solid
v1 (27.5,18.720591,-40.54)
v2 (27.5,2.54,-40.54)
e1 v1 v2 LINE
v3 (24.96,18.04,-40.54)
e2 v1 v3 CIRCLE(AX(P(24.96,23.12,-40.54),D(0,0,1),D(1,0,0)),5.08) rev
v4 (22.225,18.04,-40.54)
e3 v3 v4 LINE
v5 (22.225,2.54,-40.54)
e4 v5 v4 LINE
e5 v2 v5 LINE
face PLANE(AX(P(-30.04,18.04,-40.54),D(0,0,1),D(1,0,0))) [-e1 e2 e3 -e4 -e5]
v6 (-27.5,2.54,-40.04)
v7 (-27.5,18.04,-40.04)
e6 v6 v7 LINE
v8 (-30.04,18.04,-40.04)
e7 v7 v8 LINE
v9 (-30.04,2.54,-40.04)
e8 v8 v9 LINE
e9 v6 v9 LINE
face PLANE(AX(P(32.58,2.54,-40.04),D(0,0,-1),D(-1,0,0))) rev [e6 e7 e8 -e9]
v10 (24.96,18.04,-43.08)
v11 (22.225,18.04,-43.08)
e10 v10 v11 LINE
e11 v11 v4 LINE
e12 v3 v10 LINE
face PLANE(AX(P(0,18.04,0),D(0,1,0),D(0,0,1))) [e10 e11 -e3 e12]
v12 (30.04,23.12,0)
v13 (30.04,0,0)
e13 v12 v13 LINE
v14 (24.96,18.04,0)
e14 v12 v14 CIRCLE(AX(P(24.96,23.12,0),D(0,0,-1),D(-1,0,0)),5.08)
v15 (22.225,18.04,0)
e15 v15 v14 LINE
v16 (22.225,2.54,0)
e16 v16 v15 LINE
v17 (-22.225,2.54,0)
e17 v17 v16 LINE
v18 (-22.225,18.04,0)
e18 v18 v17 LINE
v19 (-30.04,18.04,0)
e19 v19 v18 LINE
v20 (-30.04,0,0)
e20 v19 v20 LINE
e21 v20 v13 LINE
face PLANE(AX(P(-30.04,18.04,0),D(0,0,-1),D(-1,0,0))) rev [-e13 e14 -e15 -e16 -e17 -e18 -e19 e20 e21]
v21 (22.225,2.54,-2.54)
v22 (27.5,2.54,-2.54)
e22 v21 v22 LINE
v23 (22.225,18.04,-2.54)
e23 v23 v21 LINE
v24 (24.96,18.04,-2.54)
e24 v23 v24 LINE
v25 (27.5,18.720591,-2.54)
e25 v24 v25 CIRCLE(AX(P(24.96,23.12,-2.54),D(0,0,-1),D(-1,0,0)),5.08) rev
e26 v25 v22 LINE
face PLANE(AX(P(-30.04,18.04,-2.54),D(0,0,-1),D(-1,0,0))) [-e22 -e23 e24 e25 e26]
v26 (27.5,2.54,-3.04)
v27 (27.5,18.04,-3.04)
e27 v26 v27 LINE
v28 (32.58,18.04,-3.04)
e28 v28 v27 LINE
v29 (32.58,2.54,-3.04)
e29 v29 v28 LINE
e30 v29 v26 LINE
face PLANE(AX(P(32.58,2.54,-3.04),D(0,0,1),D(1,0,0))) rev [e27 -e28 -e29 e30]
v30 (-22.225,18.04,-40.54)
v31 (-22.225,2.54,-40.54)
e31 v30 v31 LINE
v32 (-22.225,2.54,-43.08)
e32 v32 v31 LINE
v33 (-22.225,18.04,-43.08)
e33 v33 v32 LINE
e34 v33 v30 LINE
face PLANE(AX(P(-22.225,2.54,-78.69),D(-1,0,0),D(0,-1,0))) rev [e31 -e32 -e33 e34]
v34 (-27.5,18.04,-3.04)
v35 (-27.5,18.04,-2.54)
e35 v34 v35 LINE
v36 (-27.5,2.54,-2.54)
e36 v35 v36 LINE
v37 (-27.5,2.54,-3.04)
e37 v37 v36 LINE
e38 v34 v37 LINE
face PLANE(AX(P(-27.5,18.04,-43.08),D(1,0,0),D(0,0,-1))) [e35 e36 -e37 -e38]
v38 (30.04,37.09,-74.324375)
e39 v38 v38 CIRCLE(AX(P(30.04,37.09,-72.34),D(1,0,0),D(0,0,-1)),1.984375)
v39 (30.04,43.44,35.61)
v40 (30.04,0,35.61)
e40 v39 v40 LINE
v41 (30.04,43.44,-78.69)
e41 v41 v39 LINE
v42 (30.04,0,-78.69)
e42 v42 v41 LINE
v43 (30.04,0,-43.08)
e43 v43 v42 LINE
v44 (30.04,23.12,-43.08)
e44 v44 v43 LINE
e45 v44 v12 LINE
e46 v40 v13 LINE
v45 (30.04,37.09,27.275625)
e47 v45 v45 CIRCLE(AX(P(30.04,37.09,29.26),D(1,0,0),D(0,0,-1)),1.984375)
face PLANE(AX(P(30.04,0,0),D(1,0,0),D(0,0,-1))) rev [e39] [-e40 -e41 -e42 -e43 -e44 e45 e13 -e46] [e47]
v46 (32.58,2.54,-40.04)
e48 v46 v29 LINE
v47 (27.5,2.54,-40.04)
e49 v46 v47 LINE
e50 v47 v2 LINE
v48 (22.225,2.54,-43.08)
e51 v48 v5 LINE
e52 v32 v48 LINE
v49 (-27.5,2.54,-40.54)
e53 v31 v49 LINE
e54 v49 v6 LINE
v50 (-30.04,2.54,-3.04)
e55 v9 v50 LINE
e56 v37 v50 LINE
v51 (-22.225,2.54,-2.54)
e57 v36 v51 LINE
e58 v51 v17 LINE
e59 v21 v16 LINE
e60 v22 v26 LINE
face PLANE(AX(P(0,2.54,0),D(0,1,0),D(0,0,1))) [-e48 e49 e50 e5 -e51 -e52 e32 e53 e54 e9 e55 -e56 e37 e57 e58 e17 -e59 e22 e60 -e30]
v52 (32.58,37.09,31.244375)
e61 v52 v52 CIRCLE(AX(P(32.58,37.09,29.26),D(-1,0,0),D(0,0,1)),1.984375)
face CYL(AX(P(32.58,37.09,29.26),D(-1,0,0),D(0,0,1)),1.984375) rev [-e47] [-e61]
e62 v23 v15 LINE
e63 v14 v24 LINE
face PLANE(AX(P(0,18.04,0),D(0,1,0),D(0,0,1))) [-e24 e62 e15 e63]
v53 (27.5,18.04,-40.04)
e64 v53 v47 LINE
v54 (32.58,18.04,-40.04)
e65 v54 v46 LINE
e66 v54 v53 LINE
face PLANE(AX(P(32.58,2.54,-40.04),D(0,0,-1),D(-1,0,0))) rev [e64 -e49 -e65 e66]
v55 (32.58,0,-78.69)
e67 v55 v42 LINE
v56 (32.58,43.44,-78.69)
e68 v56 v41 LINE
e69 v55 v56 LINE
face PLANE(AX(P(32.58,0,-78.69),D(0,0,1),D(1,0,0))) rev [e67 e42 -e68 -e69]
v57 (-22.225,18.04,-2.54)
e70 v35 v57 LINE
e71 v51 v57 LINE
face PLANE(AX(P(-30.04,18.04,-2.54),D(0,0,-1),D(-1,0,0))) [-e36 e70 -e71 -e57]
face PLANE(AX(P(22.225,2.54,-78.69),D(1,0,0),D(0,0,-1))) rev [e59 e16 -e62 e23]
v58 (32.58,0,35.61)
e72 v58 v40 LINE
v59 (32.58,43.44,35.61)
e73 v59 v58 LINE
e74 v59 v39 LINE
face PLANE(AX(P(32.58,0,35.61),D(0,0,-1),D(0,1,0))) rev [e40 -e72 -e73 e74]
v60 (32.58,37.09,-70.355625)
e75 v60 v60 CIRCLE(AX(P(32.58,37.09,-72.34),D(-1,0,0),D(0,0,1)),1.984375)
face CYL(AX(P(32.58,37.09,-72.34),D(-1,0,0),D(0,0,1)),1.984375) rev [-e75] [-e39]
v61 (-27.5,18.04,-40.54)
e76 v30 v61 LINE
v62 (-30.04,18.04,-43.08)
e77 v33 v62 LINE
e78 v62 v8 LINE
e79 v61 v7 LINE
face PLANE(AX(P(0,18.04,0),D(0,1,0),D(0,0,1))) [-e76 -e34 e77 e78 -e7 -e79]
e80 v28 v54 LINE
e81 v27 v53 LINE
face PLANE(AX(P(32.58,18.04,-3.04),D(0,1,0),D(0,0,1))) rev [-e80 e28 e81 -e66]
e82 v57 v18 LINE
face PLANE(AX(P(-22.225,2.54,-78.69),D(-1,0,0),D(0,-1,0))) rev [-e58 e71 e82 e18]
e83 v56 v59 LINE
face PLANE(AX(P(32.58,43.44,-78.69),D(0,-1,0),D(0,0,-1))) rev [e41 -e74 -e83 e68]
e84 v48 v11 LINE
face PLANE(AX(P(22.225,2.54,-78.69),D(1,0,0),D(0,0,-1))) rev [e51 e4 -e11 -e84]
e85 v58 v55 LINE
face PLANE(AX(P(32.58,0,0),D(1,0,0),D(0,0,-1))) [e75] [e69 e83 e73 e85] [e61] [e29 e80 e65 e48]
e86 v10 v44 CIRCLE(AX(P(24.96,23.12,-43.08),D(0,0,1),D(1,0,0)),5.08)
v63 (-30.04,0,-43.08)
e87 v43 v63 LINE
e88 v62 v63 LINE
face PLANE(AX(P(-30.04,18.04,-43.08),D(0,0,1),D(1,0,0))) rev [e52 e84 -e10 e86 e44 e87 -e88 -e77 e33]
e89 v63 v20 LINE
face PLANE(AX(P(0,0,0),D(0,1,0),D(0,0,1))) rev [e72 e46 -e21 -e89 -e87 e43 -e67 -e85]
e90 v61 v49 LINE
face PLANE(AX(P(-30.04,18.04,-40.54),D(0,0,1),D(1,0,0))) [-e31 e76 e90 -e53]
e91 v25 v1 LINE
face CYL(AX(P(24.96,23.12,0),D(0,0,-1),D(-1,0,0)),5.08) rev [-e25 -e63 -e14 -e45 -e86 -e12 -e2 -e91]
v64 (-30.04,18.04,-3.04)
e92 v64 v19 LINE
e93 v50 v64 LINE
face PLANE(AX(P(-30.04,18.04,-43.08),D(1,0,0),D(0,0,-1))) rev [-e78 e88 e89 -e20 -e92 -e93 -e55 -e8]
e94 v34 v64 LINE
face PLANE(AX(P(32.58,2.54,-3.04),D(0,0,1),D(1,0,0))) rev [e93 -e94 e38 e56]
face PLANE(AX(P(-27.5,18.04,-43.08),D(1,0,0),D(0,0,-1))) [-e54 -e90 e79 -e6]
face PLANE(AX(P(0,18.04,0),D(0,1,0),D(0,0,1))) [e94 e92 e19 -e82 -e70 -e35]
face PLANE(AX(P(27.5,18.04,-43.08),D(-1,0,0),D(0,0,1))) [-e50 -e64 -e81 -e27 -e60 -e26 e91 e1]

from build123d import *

# Parameters (mm, degrees)
SKETCH1_W               = 60.079999982
SKETCH1_H               = 43.079999946
BOSS_EXTRUDE1_DEPTH     = 18.039999988
SHELL1_T                = -2.54
SKETCH2_W               = 114.3
SKETCH2_H               = 43.439999988
BOSS_EXTRUDE2_DEPTH     = 2.54
FILLET1_R               = 5.08
CUT_EXTRUDE1_DEPTH      = 109.11455079
CUT_EXTRUDE1_DEPTH_BACK = 109.11455079
SKETCH3_R               = 1.984375
SKETCH5_W               = 44.45
SKETCH5_H               = 15.499999988
CUT_EXTRUDE2_DEPTH      = 96.606517007
SKETCH6_W               = 37
SKETCH6_H               = 15.499999988
CUT_EXTRUDE3_DEPTH      = 110.54640155


with BuildPart() as part:
    # Sketch1 → Boss-Extrude1 (new body)
    with BuildSketch(Plane(origin=(0, 0, 0), x_dir=(1, 0, 0), z_dir=(0, 1, 0))):
        with Locations((0, 21.539999973)):
            Rectangle(SKETCH1_W, SKETCH1_H)
    extrude(amount=BOSS_EXTRUDE1_DEPTH)

    # Shell1
    shell1_openings = [part.faces().sort_by_distance(p)[0] for p in [
        (0, 18.039999988, -21.539999973),
    ]]
    offset(amount=SHELL1_T, openings=shell1_openings, kind=Kind.INTERSECTION)

    # Sketch2 → Boss-Extrude2 (add)
    with BuildSketch(Plane(origin=(30.039999991, 0, 0), x_dir=(0, 0, -1), z_dir=(1, 0, 0))):
        with Locations((21.539999973, 21.719999994)):
            Rectangle(SKETCH2_W, SKETCH2_H)
    extrude(amount=BOSS_EXTRUDE2_DEPTH)

    # Fillet1
    # the kernel refuses this fillet: 5.08 mm, written as the material it adds along each edge
    with BuildSketch(Plane(origin=(30.039999991, 18.039999988, -43.079999946), x_dir=(0, 1, 0), z_dir=(0, 0, 1))) as fillet1_piece_1_section:
        with BuildLine():
            CenterArc((FILLET1_R, FILLET1_R), FILLET1_R, 180, 90)
            Line((0, FILLET1_R), (0, 0))
            Line((0, 0), (FILLET1_R, 0))
        make_face()
    fillet1_piece_1 = extrude(amount=43.079999946, mode=Mode.PRIVATE)
    fillet1_piece_1 = split(fillet1_piece_1, bisect_by=Plane(origin=(29.204889828, 19.336009893, -40.539999946), z_dir=(0, 0, -1)), keep=Keep.TOP, mode=Mode.PRIVATE)
    fillet1_piece_1 = split(fillet1_piece_1, bisect_by=Plane(origin=(27.499999991, 19.336009893, -41.809999946), z_dir=(1, 0, 0)), keep=Keep.TOP, mode=Mode.PRIVATE)
    add(fillet1_piece_1)
    with BuildSketch(Plane(origin=(30.039999991, 18.039999988, -43.079999946), x_dir=(0, 1, 0), z_dir=(0, 0, 1))) as fillet1_piece_2_section:
        with BuildLine():
            CenterArc((FILLET1_R, FILLET1_R), FILLET1_R, 180, 90)
            Line((0, FILLET1_R), (0, 0))
            Line((0, 0), (FILLET1_R, 0))
        make_face()
    fillet1_piece_2 = extrude(amount=43.079999946, mode=Mode.PRIVATE)
    fillet1_piece_2 = split(fillet1_piece_2, bisect_by=Plane(origin=(26.670686006, 18.161962567, -40.539999946), z_dir=(0, 0, -1)), keep=Keep.TOP, mode=Mode.PRIVATE)
    fillet1_piece_2 = split(fillet1_piece_2, bisect_by=Plane(origin=(27.499999991, 18.161962567, -41.809999946), z_dir=(-1, 0, 0)), keep=Keep.TOP, mode=Mode.PRIVATE)
    add(fillet1_piece_2)
    with BuildSketch(Plane(origin=(30.039999991, 18.039999988, -43.079999946), x_dir=(0, 1, 0), z_dir=(0, 0, 1))) as fillet1_piece_3_section:
        with BuildLine():
            CenterArc((FILLET1_R, FILLET1_R), FILLET1_R, 180, 90)
            Line((0, FILLET1_R), (0, 0))
            Line((0, 0), (FILLET1_R, 0))
        make_face()
    fillet1_piece_3 = extrude(amount=43.079999946, mode=Mode.PRIVATE)
    fillet1_piece_3 = split(fillet1_piece_3, bisect_by=Plane(origin=(29.204889828, 19.336009893, -40.539999946), z_dir=(0, 0, 1)), keep=Keep.TOP, mode=Mode.PRIVATE)
    fillet1_piece_3 = split(fillet1_piece_3, bisect_by=Plane(origin=(29.204889828, 19.336009893, -2.54), z_dir=(0, 0, -1)), keep=Keep.TOP, mode=Mode.PRIVATE)
    fillet1_piece_3 = split(fillet1_piece_3, bisect_by=Plane(origin=(27.499999991, 19.336009893, -21.539999973), z_dir=(1, 0, 0)), keep=Keep.TOP, mode=Mode.PRIVATE)
    add(fillet1_piece_3)
    with BuildSketch(Plane(origin=(30.039999991, 18.039999988, -43.079999946), x_dir=(0, 1, 0), z_dir=(0, 0, 1))) as fillet1_piece_4_section:
        with BuildLine():
            CenterArc((FILLET1_R, FILLET1_R), FILLET1_R, 180, 90)
            Line((0, FILLET1_R), (0, 0))
            Line((0, 0), (FILLET1_R, 0))
        make_face()
    fillet1_piece_4 = extrude(amount=43.079999946, mode=Mode.PRIVATE)
    fillet1_piece_4 = split(fillet1_piece_4, bisect_by=Plane(origin=(29.204889828, 19.336009893, -2.54), z_dir=(0, 0, 1)), keep=Keep.TOP, mode=Mode.PRIVATE)
    fillet1_piece_4 = split(fillet1_piece_4, bisect_by=Plane(origin=(27.499999991, 19.336009893, -1.27), z_dir=(1, 0, 0)), keep=Keep.TOP, mode=Mode.PRIVATE)
    add(fillet1_piece_4)
    with BuildSketch(Plane(origin=(30.039999991, 18.039999988, -43.079999946), x_dir=(0, 1, 0), z_dir=(0, 0, 1))) as fillet1_piece_5_section:
        with BuildLine():
            CenterArc((FILLET1_R, FILLET1_R), FILLET1_R, 180, 90)
            Line((0, FILLET1_R), (0, 0))
            Line((0, 0), (FILLET1_R, 0))
        make_face()
    fillet1_piece_5 = extrude(amount=43.079999946, mode=Mode.PRIVATE)
    fillet1_piece_5 = split(fillet1_piece_5, bisect_by=Plane(origin=(26.670686006, 18.161962567, -2.54), z_dir=(0, 0, 1)), keep=Keep.TOP, mode=Mode.PRIVATE)
    fillet1_piece_5 = split(fillet1_piece_5, bisect_by=Plane(origin=(27.499999991, 18.161962567, -1.27), z_dir=(-1, 0, 0)), keep=Keep.TOP, mode=Mode.PRIVATE)
    add(fillet1_piece_5)

    # Sketch3 → Cut-Extrude1 (cut, two sides: drawn at the far end of the back side and taken through both)
    with BuildSketch(Plane.ZY.offset(-30.039999991).offset(-CUT_EXTRUDE1_DEPTH_BACK)):
        with Locations((-72.339999973, 37.089999988)):
            Circle(SKETCH3_R)
        with Locations((29.260000027, 37.089999988)):
            Circle(SKETCH3_R)
    extrude(amount=CUT_EXTRUDE1_DEPTH + CUT_EXTRUDE1_DEPTH_BACK, mode=Mode.SUBTRACT)

    # Sketch5 → Cut-Extrude2 (cut, through all)
    with BuildSketch(Plane.XY):
        with Locations((0, 10.289999994)):
            Rectangle(SKETCH5_W, SKETCH5_H)
    extrude(amount=-CUT_EXTRUDE2_DEPTH, mode=Mode.SUBTRACT)

    # Sketch6 → Cut-Extrude3 (cut, through all)
    with BuildSketch(Plane.ZY.offset(30.039999991)):
        with Locations((-21.539999973, 10.289999994)):
            Rectangle(SKETCH6_W, SKETCH6_H)
    extrude(amount=-CUT_EXTRUDE3_DEPTH, mode=Mode.SUBTRACT)


solid = part.part
